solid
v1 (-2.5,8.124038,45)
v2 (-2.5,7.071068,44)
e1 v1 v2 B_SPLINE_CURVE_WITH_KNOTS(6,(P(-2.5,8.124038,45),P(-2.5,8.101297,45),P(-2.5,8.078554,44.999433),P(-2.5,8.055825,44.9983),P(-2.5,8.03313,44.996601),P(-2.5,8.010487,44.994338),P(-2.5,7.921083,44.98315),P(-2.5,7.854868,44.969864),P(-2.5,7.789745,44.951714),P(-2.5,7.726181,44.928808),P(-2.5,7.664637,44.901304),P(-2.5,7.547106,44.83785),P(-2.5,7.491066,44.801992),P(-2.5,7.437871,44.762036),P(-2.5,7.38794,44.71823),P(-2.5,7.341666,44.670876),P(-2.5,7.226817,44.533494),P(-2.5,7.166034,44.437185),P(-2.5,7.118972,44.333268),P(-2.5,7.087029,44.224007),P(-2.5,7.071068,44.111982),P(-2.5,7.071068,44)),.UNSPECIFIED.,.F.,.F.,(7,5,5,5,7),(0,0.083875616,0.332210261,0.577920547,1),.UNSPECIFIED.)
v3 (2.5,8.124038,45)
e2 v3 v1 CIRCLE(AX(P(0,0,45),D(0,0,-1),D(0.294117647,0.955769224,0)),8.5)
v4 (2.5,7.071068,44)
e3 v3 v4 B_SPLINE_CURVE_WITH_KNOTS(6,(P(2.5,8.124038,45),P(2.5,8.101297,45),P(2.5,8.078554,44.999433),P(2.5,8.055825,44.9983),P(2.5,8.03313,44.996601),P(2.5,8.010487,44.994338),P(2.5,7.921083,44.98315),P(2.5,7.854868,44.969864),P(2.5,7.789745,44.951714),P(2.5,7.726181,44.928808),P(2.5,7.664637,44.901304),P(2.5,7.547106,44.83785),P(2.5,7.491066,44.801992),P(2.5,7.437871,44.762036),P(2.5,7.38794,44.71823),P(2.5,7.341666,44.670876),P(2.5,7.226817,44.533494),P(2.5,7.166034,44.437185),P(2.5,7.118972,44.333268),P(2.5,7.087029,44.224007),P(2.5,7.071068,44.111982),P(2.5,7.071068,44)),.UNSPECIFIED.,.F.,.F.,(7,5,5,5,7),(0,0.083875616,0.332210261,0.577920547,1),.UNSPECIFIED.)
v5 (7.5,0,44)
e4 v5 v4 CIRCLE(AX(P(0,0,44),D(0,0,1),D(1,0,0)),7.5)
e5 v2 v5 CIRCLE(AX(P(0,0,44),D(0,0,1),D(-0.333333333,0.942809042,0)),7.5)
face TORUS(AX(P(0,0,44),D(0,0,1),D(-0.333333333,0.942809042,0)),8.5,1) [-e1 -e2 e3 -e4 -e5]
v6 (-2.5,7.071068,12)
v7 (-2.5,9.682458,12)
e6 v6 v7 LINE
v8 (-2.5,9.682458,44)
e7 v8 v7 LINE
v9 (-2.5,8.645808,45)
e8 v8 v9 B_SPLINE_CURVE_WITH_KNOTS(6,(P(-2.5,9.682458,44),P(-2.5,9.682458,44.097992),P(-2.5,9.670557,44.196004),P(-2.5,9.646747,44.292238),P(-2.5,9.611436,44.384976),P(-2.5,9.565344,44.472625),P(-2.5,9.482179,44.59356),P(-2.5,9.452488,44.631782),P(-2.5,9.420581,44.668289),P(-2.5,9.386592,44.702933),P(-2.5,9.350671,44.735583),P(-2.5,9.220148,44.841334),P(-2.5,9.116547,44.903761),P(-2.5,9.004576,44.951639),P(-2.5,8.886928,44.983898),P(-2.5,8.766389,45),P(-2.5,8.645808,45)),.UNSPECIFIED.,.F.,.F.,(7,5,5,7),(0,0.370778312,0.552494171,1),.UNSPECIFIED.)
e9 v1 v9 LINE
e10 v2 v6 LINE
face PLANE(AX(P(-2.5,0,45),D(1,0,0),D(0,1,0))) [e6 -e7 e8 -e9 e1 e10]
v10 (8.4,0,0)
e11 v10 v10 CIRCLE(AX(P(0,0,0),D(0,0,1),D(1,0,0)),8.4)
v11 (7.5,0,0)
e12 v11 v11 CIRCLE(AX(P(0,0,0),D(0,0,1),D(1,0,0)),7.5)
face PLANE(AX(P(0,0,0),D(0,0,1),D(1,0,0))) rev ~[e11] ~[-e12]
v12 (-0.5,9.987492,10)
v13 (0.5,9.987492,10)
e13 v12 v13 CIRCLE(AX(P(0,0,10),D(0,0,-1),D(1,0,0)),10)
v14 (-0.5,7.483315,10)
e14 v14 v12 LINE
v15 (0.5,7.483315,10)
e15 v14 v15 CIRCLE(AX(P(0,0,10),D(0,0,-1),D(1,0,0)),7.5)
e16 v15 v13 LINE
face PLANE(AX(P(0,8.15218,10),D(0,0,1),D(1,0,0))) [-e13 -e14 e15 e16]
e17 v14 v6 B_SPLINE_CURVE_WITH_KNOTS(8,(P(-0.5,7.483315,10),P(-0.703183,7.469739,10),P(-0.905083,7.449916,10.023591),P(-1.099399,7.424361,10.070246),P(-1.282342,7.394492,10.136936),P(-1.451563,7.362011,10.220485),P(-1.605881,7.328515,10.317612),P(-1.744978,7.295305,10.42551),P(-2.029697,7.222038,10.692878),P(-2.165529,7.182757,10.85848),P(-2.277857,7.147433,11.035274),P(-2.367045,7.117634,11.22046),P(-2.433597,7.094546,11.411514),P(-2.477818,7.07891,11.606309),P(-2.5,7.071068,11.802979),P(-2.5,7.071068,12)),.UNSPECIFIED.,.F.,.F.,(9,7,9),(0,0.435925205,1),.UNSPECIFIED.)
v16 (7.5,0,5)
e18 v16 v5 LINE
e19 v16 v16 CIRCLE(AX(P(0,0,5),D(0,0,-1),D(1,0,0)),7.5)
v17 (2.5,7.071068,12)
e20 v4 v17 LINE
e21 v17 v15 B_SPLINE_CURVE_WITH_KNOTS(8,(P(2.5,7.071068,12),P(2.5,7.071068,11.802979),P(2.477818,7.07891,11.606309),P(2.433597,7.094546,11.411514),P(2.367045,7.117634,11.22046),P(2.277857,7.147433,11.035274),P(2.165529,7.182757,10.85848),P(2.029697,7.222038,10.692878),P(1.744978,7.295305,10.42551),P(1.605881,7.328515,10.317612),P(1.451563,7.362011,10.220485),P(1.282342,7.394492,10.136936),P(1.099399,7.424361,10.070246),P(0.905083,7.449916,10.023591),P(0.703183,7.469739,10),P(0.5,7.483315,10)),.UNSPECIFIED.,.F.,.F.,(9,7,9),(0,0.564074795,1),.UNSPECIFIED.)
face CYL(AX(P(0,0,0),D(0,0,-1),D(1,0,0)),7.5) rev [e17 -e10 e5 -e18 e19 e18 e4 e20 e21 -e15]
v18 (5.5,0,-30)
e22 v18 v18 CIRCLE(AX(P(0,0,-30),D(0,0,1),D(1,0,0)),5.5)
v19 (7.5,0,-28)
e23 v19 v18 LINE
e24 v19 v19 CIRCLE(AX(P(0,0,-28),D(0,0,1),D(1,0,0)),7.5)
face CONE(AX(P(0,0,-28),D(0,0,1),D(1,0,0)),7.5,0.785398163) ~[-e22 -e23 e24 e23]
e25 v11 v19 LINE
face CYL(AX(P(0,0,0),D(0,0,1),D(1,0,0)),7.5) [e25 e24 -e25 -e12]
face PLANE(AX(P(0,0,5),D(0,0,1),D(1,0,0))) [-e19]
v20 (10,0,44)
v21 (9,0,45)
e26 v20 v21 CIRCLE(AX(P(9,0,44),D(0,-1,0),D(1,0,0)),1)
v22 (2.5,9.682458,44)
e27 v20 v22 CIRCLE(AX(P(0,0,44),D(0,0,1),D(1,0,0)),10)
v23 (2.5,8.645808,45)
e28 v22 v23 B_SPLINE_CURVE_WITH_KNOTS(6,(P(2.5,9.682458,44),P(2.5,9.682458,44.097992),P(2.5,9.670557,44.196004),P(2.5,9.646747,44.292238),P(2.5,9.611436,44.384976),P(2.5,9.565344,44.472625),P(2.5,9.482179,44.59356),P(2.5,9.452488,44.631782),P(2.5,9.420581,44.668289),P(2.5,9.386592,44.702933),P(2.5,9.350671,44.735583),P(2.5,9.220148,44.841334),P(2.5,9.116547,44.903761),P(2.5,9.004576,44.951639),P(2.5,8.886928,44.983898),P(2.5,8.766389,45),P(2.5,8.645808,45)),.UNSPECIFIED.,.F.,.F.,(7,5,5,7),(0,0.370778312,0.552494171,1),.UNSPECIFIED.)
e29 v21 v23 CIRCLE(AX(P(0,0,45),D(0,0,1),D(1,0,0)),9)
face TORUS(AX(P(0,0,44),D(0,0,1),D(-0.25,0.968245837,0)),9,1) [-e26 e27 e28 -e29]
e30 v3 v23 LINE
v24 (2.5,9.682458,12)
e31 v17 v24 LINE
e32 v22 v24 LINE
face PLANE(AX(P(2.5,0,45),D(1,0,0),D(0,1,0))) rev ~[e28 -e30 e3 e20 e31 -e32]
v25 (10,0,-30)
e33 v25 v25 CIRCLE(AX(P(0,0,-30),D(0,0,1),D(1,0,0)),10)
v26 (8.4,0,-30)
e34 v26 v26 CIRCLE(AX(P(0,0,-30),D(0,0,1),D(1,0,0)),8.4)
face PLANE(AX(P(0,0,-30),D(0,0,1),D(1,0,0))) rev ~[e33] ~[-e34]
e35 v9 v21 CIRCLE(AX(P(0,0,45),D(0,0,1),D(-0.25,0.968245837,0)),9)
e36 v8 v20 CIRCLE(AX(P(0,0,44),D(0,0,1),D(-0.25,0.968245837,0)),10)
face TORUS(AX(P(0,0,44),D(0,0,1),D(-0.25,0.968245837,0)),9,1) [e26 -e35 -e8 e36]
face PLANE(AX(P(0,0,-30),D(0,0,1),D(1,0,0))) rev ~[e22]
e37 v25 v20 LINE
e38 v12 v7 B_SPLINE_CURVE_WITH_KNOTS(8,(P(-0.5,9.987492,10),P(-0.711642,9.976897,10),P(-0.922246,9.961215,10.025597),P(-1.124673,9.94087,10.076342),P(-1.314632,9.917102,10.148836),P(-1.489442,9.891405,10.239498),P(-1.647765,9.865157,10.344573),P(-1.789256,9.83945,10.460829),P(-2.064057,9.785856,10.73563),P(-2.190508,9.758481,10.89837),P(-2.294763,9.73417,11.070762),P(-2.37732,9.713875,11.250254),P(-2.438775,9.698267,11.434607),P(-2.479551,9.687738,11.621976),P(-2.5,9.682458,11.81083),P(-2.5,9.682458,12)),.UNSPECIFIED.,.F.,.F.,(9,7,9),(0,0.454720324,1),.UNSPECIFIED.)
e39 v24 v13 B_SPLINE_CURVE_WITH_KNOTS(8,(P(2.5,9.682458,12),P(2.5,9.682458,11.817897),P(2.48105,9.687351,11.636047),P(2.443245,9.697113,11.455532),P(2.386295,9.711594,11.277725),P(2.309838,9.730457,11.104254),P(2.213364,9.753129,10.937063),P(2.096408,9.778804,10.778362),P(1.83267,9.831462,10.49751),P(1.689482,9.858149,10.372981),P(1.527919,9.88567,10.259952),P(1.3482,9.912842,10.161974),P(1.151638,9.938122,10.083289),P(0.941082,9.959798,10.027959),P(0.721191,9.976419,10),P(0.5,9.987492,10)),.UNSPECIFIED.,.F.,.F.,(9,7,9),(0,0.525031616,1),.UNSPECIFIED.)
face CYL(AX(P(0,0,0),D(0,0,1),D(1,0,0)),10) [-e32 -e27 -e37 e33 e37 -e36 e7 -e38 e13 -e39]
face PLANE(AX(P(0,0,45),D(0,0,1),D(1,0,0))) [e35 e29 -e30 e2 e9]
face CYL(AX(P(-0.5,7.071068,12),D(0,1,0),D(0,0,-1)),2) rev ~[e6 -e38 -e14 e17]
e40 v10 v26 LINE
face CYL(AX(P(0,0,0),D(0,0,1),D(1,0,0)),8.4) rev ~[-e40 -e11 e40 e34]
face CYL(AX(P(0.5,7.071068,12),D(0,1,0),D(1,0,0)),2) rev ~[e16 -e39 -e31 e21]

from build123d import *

# Parameters (mm, degrees)
F0_R     = 10
F0_R_2   = 7.5
F1_DEPTH = 45
F2_DEPTH = 5
F3_R     = 10
F3_R_2   = 8.4
F4_DEPTH = 30
F5_SIZE  = 2
F6_W     = 5
F6_H     = 16.3043601838
F7_DEPTH = 35
F8_R     = 2
F9_R     = 1


with BuildPart() as f1:
    # F0 (on Top) → F1 (new body)
    with BuildSketch(Plane.XY):
        Circle(F0_R)
        Circle(F0_R_2, mode=Mode.SUBTRACT)
    extrude(amount=F1_DEPTH)

    # F0 (on Top) → F2 (join)
    with BuildSketch(Plane.XY):
        Circle(F0_R)
        Circle(F0_R_2, mode=Mode.SUBTRACT)
        Circle(F0_R_2)
    extrude(amount=F2_DEPTH)

    # F3 (on Top) + F0 (on Top) → F4 (join)
    with BuildSketch(Plane.XY):
        Circle(F3_R)
        Circle(F3_R_2, mode=Mode.SUBTRACT)
    with BuildSketch(Plane.XY):
        Circle(F0_R_2)
    extrude(amount=-F4_DEPTH)

    # F5
    f5_edges = [f1.edges().sort_by_distance(p)[0] for p in [
        (-7.5, 0, -30),
    ]]
    chamfer(f5_edges, length=F5_SIZE)

    # F6 (on face) → F7 (cut)
    with BuildSketch(Plane.XY.offset(45)):
        with Locations((0, 8.1521800919)):
            Rectangle(F6_W, F6_H)
    extrude(amount=-F7_DEPTH, mode=Mode.SUBTRACT)

    # F8
    f8_edges = [f1.edges().sort_by_distance(p)[0] for p in [
        (2.5, 8.376763, 10),
        (-2.5, 8.376763, 10),
    ]]
    fillet(f8_edges, radius=F8_R)

    # F9
    f9_edges = [f1.edges().sort_by_distance(p)[0] for p in [
        (-6.123724, -7.905694, 45),
        (7.905694, 6.123724, 45),
        (-4.330127, -6.123724, 45),
        (6.123724, 4.330127, 45),
    ]]
    fillet(f9_edges, radius=F9_R)


solid = f1.part
